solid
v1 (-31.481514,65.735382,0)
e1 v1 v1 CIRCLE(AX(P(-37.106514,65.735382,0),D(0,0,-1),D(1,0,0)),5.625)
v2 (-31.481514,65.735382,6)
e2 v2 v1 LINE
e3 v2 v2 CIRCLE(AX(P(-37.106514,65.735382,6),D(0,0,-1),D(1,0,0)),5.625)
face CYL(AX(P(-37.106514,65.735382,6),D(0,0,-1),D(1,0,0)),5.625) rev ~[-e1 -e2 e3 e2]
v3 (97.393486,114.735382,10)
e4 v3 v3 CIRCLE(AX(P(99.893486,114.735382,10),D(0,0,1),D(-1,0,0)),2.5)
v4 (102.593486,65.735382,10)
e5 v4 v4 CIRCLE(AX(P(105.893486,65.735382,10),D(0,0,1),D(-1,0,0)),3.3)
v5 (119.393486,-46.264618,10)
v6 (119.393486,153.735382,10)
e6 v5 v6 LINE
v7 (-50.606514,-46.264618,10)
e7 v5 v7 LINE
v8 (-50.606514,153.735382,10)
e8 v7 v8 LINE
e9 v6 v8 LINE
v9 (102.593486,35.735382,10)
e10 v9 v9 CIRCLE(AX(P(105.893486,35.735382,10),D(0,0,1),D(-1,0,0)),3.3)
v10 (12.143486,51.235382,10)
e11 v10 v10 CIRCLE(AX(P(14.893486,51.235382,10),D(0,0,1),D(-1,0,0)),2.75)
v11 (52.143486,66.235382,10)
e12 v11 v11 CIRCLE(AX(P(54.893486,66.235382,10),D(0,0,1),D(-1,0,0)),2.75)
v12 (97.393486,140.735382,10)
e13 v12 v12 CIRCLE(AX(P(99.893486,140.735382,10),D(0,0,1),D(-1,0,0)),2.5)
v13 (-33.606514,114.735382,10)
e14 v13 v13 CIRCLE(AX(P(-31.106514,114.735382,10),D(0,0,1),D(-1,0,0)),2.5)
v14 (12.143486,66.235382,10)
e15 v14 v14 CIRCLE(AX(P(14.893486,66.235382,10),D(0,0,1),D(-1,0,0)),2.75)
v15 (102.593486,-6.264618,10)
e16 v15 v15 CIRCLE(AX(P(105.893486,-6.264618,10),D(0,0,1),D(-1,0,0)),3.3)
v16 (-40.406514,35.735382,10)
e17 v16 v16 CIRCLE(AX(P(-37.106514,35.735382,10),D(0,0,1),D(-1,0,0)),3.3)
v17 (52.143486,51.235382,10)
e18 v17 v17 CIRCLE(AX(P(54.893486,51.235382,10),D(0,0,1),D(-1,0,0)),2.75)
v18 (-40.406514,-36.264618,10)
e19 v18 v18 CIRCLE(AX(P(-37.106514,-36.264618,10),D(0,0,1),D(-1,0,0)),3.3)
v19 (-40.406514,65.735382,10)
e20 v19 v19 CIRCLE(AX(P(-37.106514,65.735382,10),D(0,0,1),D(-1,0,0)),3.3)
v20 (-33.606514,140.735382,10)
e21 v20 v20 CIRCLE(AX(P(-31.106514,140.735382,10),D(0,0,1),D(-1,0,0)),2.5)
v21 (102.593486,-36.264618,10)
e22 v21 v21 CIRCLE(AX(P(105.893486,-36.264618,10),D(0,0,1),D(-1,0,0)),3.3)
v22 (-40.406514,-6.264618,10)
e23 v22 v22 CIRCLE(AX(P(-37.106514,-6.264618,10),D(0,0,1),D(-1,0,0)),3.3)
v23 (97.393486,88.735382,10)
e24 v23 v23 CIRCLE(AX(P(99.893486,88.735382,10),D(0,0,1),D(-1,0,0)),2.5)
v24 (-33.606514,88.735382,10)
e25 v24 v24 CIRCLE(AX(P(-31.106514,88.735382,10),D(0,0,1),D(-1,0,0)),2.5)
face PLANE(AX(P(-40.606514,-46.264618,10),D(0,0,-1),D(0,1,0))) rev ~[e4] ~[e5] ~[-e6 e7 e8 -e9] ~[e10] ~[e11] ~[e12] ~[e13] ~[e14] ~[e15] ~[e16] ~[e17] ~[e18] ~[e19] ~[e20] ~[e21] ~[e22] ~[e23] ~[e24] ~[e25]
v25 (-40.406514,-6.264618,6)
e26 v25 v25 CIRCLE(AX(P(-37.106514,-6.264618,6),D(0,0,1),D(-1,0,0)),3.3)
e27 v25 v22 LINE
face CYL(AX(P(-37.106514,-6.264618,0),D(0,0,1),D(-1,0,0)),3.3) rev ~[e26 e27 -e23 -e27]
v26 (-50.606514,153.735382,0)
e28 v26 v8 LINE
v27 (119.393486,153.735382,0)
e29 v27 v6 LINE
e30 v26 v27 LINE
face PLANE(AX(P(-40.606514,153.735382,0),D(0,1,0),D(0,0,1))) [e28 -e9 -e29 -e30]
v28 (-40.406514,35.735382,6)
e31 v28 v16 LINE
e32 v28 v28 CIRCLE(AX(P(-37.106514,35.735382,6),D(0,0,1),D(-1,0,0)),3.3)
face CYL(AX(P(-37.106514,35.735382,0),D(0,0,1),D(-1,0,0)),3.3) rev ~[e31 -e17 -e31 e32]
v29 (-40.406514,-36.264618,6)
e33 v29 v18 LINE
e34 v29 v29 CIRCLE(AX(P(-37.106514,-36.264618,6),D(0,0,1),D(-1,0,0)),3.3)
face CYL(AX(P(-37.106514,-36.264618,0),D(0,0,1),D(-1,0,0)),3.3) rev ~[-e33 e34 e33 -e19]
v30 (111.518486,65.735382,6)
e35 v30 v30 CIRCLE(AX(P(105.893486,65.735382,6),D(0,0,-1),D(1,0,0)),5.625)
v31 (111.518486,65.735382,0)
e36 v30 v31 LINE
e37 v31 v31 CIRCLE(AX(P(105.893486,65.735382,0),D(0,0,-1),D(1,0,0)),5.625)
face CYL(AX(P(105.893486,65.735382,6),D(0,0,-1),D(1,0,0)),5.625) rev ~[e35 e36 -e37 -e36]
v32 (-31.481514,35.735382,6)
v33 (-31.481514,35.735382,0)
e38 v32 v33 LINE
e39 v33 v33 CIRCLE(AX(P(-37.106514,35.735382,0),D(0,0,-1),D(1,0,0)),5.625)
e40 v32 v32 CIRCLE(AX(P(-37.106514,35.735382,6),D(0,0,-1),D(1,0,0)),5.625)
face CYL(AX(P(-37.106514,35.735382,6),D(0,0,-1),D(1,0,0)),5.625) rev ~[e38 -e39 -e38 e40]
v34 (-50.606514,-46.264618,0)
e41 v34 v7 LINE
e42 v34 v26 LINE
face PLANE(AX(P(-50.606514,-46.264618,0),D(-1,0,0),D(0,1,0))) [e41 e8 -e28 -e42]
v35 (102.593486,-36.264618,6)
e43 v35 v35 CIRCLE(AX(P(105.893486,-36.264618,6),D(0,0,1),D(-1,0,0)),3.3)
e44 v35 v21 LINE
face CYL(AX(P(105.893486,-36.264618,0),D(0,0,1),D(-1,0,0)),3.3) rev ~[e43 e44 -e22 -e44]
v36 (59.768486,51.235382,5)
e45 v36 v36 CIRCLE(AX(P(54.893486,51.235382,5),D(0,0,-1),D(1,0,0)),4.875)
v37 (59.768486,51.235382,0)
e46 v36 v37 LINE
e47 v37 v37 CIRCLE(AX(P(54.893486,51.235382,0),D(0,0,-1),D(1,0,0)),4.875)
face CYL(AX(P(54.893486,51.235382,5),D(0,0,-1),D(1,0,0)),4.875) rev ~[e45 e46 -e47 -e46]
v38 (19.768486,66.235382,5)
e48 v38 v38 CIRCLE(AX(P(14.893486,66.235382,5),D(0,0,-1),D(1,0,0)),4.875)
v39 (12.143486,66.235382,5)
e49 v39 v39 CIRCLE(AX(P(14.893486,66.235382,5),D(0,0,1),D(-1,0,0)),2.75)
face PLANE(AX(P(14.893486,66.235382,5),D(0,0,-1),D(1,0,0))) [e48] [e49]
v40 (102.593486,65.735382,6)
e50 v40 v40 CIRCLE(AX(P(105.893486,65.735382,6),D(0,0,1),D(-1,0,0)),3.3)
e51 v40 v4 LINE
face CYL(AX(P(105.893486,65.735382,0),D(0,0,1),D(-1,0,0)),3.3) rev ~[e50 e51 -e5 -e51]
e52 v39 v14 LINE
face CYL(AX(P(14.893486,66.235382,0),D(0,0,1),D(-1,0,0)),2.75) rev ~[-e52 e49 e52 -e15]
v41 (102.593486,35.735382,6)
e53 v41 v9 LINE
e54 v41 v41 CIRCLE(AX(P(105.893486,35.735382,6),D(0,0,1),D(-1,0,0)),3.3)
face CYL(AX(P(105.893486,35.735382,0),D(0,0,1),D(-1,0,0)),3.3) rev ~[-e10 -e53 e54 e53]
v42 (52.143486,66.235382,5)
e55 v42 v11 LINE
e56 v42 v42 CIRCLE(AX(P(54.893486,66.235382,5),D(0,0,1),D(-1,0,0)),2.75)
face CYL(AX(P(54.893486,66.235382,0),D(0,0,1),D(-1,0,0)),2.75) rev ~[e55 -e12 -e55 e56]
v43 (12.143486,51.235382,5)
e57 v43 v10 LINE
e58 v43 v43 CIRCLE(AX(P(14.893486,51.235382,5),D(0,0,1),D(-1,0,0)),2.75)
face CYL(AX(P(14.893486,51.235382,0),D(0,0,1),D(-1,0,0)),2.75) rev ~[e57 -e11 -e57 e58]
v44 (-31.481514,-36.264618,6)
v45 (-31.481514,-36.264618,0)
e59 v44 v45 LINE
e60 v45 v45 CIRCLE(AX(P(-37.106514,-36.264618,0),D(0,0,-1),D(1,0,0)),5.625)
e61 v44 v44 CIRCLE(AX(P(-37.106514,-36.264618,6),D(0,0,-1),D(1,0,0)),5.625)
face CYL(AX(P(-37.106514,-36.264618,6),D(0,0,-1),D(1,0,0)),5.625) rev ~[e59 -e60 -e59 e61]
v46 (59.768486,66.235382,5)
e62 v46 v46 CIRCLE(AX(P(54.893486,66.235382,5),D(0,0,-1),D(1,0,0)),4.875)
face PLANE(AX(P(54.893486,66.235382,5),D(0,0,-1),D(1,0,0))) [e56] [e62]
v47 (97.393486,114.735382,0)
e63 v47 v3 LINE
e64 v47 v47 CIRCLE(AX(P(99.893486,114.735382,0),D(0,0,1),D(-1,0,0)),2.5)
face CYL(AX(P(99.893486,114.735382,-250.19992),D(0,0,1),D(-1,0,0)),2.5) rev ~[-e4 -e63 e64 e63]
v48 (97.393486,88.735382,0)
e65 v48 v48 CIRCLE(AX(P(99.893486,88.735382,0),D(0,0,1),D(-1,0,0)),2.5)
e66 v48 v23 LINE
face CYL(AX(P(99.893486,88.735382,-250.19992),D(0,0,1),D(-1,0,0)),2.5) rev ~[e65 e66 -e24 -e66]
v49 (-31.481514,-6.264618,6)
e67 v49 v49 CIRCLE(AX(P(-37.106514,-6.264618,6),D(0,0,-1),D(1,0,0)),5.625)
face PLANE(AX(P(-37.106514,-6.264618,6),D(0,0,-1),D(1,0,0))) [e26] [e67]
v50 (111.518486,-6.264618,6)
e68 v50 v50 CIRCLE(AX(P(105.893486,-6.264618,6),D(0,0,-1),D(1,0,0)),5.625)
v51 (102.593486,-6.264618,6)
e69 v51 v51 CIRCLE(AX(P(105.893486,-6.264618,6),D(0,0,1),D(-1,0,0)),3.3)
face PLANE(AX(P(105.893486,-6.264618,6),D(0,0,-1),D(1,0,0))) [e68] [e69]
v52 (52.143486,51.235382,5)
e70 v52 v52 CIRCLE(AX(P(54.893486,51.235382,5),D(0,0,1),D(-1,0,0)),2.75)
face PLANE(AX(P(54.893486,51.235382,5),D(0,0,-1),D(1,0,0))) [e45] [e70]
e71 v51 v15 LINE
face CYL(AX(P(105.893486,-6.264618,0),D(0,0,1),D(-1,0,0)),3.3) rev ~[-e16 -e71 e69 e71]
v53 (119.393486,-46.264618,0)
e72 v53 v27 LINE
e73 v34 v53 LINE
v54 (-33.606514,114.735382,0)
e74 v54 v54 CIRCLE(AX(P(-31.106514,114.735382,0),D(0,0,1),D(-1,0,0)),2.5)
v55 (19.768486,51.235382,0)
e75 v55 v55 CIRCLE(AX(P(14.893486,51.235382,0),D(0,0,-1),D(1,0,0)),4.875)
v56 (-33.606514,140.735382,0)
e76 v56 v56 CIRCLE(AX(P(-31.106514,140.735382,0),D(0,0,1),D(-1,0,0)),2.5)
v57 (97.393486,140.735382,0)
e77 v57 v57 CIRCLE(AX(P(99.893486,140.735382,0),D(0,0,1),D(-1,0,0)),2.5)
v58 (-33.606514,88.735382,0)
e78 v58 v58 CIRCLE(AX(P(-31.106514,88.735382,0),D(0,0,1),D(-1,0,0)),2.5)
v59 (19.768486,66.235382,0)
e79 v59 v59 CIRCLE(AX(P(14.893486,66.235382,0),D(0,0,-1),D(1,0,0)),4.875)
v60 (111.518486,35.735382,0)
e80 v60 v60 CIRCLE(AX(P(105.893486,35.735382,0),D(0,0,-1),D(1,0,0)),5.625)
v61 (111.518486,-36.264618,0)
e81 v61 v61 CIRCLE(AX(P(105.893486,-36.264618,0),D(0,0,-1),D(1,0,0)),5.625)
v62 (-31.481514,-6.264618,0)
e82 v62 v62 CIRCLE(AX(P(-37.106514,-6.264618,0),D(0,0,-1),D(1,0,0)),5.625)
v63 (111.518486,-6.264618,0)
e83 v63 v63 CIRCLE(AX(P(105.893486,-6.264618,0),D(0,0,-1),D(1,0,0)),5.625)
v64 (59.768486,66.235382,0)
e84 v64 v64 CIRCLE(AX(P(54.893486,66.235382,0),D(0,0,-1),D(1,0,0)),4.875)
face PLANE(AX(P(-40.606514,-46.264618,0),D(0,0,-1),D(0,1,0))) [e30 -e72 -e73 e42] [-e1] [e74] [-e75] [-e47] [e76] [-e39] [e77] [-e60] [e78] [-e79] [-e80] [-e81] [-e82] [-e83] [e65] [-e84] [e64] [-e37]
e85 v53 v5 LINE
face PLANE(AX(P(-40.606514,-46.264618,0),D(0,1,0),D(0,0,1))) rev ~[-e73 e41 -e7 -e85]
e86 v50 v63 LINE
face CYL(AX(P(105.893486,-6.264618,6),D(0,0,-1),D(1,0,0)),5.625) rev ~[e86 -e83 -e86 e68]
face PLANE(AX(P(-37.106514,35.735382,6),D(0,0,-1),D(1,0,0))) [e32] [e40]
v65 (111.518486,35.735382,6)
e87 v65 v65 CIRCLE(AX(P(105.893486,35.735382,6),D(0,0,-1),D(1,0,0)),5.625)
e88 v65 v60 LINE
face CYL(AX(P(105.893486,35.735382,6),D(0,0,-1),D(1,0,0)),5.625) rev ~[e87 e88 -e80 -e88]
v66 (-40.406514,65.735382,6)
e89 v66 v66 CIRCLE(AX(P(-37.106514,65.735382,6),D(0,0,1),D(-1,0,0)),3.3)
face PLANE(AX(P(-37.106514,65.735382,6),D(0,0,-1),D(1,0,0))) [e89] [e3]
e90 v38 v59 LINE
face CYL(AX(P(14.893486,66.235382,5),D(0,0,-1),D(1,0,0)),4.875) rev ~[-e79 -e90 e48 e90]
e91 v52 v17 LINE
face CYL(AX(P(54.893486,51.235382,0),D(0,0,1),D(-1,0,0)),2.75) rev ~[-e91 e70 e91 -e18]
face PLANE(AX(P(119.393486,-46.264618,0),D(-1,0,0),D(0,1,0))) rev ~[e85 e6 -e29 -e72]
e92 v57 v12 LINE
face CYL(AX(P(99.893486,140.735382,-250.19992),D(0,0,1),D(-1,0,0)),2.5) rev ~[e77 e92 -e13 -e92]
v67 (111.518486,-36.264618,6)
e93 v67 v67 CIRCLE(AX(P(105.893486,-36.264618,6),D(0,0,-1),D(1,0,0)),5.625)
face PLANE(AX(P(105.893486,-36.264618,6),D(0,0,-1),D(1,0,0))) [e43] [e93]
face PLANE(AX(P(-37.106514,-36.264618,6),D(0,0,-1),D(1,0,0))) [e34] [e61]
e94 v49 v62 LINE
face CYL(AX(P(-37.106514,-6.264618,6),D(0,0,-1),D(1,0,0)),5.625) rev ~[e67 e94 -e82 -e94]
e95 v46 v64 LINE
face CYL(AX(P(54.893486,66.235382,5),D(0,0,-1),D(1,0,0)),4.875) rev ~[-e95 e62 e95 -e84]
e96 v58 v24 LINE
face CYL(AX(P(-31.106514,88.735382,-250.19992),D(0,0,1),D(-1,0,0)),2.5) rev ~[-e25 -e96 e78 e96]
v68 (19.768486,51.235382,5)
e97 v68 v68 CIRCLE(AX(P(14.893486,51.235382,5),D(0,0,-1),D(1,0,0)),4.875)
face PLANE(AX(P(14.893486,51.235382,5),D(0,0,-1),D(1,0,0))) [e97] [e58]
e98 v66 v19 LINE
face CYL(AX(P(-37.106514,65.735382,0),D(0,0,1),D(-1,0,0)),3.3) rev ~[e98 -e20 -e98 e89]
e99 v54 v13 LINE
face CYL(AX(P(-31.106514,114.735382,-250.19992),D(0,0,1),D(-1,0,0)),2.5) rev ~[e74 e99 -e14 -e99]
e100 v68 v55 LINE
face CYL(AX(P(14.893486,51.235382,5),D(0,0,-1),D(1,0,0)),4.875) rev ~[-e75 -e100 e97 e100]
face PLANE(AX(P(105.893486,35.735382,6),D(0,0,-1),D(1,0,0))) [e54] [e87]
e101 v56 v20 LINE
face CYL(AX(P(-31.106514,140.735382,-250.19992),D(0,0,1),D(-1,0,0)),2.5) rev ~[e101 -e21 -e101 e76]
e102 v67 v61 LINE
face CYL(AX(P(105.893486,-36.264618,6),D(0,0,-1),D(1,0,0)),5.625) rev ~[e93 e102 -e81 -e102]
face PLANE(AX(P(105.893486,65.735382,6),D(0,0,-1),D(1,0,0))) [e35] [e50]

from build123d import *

# Parameters (mm, degrees)
F0_W           = 150
F0_H           = 200
F1_DEPTH       = 10
F3_D           = 5
F5_DEPTH       = 10
F6_DEPTH       = 10
F7_D           = 6.6
F7_CBORE_D     = 11.25
F7_CBORE_DEPTH = 6
F8_D           = 5.5
F8_CBORE_D     = 9.75
F8_CBORE_DEPTH = 5


# Not quite as in the source:
# - a feature names something its author has since deleted; it is built from what else it names


with BuildPart() as f1:
    # F0 (on Top) → F1 (new body)
    with BuildSketch(Plane.XY):
        with Locations((34.3934863061, 53.7353821645)):
            Rectangle(F0_W, F0_H)
    extrude(amount=F1_DEPTH)

    # F3 (through all)
    with Locations(Plane(origin=(0, 0, 0), x_dir=(1, 0, 0), z_dir=(0, 0, -1))):
        with Locations((-31.1065136939, -140.7353821645), (-31.1065136939, -114.7353821645), (-31.1065136939, -88.7353821645), (99.8934863061, -88.7353821645), (99.8934863061, -114.7353821645), (99.8934863061, -140.7353821645)):
            Hole(F3_D / 2)

    # F5 (add): a face of the model
    f5_faces = [f1.faces().sort_by_distance(p)[0] for p in [
        (109.3934863061, 53.7353821645, 5),
    ]]
    extrude(f5_faces, amount=F5_DEPTH)

    # F6 (add): a face of the model
    f6_faces = [f1.faces().sort_by_distance(p)[0] for p in [
        (-40.6065136939, 53.7353821645, 5),
    ]]
    extrude(f6_faces, amount=F6_DEPTH)

    # F7 (through all)
    with Locations(Plane(origin=(0, 0, 0), x_dir=(1, 0, 0), z_dir=(0, 0, -1))):
        with Locations((-37.1065136939, 36.2646178355), (-37.1065136939, 6.2646178355), (105.8934863061, 36.2646178355), (105.8934863061, 6.2646178355), (105.8934863061, -35.7353821645), (105.8934863061, -65.7353821645), (-37.1065136939, -65.7353821645), (-37.1065136939, -35.7353821645)):
            CounterBoreHole(F7_D / 2, F7_CBORE_D / 2, F7_CBORE_DEPTH)

    # F8 (through all)
    with Locations(Plane(origin=(0, 0, 0), x_dir=(1, 0, 0), z_dir=(0, 0, -1))):
        with Locations((54.8934863061, -51.2353821645), (54.8934863061, -66.2353821645), (14.8934863061, -51.2353821645), (14.8934863061, -66.2353821645)):
            CounterBoreHole(F8_D / 2, F8_CBORE_D / 2, F8_CBORE_DEPTH)


solid = f1.part
